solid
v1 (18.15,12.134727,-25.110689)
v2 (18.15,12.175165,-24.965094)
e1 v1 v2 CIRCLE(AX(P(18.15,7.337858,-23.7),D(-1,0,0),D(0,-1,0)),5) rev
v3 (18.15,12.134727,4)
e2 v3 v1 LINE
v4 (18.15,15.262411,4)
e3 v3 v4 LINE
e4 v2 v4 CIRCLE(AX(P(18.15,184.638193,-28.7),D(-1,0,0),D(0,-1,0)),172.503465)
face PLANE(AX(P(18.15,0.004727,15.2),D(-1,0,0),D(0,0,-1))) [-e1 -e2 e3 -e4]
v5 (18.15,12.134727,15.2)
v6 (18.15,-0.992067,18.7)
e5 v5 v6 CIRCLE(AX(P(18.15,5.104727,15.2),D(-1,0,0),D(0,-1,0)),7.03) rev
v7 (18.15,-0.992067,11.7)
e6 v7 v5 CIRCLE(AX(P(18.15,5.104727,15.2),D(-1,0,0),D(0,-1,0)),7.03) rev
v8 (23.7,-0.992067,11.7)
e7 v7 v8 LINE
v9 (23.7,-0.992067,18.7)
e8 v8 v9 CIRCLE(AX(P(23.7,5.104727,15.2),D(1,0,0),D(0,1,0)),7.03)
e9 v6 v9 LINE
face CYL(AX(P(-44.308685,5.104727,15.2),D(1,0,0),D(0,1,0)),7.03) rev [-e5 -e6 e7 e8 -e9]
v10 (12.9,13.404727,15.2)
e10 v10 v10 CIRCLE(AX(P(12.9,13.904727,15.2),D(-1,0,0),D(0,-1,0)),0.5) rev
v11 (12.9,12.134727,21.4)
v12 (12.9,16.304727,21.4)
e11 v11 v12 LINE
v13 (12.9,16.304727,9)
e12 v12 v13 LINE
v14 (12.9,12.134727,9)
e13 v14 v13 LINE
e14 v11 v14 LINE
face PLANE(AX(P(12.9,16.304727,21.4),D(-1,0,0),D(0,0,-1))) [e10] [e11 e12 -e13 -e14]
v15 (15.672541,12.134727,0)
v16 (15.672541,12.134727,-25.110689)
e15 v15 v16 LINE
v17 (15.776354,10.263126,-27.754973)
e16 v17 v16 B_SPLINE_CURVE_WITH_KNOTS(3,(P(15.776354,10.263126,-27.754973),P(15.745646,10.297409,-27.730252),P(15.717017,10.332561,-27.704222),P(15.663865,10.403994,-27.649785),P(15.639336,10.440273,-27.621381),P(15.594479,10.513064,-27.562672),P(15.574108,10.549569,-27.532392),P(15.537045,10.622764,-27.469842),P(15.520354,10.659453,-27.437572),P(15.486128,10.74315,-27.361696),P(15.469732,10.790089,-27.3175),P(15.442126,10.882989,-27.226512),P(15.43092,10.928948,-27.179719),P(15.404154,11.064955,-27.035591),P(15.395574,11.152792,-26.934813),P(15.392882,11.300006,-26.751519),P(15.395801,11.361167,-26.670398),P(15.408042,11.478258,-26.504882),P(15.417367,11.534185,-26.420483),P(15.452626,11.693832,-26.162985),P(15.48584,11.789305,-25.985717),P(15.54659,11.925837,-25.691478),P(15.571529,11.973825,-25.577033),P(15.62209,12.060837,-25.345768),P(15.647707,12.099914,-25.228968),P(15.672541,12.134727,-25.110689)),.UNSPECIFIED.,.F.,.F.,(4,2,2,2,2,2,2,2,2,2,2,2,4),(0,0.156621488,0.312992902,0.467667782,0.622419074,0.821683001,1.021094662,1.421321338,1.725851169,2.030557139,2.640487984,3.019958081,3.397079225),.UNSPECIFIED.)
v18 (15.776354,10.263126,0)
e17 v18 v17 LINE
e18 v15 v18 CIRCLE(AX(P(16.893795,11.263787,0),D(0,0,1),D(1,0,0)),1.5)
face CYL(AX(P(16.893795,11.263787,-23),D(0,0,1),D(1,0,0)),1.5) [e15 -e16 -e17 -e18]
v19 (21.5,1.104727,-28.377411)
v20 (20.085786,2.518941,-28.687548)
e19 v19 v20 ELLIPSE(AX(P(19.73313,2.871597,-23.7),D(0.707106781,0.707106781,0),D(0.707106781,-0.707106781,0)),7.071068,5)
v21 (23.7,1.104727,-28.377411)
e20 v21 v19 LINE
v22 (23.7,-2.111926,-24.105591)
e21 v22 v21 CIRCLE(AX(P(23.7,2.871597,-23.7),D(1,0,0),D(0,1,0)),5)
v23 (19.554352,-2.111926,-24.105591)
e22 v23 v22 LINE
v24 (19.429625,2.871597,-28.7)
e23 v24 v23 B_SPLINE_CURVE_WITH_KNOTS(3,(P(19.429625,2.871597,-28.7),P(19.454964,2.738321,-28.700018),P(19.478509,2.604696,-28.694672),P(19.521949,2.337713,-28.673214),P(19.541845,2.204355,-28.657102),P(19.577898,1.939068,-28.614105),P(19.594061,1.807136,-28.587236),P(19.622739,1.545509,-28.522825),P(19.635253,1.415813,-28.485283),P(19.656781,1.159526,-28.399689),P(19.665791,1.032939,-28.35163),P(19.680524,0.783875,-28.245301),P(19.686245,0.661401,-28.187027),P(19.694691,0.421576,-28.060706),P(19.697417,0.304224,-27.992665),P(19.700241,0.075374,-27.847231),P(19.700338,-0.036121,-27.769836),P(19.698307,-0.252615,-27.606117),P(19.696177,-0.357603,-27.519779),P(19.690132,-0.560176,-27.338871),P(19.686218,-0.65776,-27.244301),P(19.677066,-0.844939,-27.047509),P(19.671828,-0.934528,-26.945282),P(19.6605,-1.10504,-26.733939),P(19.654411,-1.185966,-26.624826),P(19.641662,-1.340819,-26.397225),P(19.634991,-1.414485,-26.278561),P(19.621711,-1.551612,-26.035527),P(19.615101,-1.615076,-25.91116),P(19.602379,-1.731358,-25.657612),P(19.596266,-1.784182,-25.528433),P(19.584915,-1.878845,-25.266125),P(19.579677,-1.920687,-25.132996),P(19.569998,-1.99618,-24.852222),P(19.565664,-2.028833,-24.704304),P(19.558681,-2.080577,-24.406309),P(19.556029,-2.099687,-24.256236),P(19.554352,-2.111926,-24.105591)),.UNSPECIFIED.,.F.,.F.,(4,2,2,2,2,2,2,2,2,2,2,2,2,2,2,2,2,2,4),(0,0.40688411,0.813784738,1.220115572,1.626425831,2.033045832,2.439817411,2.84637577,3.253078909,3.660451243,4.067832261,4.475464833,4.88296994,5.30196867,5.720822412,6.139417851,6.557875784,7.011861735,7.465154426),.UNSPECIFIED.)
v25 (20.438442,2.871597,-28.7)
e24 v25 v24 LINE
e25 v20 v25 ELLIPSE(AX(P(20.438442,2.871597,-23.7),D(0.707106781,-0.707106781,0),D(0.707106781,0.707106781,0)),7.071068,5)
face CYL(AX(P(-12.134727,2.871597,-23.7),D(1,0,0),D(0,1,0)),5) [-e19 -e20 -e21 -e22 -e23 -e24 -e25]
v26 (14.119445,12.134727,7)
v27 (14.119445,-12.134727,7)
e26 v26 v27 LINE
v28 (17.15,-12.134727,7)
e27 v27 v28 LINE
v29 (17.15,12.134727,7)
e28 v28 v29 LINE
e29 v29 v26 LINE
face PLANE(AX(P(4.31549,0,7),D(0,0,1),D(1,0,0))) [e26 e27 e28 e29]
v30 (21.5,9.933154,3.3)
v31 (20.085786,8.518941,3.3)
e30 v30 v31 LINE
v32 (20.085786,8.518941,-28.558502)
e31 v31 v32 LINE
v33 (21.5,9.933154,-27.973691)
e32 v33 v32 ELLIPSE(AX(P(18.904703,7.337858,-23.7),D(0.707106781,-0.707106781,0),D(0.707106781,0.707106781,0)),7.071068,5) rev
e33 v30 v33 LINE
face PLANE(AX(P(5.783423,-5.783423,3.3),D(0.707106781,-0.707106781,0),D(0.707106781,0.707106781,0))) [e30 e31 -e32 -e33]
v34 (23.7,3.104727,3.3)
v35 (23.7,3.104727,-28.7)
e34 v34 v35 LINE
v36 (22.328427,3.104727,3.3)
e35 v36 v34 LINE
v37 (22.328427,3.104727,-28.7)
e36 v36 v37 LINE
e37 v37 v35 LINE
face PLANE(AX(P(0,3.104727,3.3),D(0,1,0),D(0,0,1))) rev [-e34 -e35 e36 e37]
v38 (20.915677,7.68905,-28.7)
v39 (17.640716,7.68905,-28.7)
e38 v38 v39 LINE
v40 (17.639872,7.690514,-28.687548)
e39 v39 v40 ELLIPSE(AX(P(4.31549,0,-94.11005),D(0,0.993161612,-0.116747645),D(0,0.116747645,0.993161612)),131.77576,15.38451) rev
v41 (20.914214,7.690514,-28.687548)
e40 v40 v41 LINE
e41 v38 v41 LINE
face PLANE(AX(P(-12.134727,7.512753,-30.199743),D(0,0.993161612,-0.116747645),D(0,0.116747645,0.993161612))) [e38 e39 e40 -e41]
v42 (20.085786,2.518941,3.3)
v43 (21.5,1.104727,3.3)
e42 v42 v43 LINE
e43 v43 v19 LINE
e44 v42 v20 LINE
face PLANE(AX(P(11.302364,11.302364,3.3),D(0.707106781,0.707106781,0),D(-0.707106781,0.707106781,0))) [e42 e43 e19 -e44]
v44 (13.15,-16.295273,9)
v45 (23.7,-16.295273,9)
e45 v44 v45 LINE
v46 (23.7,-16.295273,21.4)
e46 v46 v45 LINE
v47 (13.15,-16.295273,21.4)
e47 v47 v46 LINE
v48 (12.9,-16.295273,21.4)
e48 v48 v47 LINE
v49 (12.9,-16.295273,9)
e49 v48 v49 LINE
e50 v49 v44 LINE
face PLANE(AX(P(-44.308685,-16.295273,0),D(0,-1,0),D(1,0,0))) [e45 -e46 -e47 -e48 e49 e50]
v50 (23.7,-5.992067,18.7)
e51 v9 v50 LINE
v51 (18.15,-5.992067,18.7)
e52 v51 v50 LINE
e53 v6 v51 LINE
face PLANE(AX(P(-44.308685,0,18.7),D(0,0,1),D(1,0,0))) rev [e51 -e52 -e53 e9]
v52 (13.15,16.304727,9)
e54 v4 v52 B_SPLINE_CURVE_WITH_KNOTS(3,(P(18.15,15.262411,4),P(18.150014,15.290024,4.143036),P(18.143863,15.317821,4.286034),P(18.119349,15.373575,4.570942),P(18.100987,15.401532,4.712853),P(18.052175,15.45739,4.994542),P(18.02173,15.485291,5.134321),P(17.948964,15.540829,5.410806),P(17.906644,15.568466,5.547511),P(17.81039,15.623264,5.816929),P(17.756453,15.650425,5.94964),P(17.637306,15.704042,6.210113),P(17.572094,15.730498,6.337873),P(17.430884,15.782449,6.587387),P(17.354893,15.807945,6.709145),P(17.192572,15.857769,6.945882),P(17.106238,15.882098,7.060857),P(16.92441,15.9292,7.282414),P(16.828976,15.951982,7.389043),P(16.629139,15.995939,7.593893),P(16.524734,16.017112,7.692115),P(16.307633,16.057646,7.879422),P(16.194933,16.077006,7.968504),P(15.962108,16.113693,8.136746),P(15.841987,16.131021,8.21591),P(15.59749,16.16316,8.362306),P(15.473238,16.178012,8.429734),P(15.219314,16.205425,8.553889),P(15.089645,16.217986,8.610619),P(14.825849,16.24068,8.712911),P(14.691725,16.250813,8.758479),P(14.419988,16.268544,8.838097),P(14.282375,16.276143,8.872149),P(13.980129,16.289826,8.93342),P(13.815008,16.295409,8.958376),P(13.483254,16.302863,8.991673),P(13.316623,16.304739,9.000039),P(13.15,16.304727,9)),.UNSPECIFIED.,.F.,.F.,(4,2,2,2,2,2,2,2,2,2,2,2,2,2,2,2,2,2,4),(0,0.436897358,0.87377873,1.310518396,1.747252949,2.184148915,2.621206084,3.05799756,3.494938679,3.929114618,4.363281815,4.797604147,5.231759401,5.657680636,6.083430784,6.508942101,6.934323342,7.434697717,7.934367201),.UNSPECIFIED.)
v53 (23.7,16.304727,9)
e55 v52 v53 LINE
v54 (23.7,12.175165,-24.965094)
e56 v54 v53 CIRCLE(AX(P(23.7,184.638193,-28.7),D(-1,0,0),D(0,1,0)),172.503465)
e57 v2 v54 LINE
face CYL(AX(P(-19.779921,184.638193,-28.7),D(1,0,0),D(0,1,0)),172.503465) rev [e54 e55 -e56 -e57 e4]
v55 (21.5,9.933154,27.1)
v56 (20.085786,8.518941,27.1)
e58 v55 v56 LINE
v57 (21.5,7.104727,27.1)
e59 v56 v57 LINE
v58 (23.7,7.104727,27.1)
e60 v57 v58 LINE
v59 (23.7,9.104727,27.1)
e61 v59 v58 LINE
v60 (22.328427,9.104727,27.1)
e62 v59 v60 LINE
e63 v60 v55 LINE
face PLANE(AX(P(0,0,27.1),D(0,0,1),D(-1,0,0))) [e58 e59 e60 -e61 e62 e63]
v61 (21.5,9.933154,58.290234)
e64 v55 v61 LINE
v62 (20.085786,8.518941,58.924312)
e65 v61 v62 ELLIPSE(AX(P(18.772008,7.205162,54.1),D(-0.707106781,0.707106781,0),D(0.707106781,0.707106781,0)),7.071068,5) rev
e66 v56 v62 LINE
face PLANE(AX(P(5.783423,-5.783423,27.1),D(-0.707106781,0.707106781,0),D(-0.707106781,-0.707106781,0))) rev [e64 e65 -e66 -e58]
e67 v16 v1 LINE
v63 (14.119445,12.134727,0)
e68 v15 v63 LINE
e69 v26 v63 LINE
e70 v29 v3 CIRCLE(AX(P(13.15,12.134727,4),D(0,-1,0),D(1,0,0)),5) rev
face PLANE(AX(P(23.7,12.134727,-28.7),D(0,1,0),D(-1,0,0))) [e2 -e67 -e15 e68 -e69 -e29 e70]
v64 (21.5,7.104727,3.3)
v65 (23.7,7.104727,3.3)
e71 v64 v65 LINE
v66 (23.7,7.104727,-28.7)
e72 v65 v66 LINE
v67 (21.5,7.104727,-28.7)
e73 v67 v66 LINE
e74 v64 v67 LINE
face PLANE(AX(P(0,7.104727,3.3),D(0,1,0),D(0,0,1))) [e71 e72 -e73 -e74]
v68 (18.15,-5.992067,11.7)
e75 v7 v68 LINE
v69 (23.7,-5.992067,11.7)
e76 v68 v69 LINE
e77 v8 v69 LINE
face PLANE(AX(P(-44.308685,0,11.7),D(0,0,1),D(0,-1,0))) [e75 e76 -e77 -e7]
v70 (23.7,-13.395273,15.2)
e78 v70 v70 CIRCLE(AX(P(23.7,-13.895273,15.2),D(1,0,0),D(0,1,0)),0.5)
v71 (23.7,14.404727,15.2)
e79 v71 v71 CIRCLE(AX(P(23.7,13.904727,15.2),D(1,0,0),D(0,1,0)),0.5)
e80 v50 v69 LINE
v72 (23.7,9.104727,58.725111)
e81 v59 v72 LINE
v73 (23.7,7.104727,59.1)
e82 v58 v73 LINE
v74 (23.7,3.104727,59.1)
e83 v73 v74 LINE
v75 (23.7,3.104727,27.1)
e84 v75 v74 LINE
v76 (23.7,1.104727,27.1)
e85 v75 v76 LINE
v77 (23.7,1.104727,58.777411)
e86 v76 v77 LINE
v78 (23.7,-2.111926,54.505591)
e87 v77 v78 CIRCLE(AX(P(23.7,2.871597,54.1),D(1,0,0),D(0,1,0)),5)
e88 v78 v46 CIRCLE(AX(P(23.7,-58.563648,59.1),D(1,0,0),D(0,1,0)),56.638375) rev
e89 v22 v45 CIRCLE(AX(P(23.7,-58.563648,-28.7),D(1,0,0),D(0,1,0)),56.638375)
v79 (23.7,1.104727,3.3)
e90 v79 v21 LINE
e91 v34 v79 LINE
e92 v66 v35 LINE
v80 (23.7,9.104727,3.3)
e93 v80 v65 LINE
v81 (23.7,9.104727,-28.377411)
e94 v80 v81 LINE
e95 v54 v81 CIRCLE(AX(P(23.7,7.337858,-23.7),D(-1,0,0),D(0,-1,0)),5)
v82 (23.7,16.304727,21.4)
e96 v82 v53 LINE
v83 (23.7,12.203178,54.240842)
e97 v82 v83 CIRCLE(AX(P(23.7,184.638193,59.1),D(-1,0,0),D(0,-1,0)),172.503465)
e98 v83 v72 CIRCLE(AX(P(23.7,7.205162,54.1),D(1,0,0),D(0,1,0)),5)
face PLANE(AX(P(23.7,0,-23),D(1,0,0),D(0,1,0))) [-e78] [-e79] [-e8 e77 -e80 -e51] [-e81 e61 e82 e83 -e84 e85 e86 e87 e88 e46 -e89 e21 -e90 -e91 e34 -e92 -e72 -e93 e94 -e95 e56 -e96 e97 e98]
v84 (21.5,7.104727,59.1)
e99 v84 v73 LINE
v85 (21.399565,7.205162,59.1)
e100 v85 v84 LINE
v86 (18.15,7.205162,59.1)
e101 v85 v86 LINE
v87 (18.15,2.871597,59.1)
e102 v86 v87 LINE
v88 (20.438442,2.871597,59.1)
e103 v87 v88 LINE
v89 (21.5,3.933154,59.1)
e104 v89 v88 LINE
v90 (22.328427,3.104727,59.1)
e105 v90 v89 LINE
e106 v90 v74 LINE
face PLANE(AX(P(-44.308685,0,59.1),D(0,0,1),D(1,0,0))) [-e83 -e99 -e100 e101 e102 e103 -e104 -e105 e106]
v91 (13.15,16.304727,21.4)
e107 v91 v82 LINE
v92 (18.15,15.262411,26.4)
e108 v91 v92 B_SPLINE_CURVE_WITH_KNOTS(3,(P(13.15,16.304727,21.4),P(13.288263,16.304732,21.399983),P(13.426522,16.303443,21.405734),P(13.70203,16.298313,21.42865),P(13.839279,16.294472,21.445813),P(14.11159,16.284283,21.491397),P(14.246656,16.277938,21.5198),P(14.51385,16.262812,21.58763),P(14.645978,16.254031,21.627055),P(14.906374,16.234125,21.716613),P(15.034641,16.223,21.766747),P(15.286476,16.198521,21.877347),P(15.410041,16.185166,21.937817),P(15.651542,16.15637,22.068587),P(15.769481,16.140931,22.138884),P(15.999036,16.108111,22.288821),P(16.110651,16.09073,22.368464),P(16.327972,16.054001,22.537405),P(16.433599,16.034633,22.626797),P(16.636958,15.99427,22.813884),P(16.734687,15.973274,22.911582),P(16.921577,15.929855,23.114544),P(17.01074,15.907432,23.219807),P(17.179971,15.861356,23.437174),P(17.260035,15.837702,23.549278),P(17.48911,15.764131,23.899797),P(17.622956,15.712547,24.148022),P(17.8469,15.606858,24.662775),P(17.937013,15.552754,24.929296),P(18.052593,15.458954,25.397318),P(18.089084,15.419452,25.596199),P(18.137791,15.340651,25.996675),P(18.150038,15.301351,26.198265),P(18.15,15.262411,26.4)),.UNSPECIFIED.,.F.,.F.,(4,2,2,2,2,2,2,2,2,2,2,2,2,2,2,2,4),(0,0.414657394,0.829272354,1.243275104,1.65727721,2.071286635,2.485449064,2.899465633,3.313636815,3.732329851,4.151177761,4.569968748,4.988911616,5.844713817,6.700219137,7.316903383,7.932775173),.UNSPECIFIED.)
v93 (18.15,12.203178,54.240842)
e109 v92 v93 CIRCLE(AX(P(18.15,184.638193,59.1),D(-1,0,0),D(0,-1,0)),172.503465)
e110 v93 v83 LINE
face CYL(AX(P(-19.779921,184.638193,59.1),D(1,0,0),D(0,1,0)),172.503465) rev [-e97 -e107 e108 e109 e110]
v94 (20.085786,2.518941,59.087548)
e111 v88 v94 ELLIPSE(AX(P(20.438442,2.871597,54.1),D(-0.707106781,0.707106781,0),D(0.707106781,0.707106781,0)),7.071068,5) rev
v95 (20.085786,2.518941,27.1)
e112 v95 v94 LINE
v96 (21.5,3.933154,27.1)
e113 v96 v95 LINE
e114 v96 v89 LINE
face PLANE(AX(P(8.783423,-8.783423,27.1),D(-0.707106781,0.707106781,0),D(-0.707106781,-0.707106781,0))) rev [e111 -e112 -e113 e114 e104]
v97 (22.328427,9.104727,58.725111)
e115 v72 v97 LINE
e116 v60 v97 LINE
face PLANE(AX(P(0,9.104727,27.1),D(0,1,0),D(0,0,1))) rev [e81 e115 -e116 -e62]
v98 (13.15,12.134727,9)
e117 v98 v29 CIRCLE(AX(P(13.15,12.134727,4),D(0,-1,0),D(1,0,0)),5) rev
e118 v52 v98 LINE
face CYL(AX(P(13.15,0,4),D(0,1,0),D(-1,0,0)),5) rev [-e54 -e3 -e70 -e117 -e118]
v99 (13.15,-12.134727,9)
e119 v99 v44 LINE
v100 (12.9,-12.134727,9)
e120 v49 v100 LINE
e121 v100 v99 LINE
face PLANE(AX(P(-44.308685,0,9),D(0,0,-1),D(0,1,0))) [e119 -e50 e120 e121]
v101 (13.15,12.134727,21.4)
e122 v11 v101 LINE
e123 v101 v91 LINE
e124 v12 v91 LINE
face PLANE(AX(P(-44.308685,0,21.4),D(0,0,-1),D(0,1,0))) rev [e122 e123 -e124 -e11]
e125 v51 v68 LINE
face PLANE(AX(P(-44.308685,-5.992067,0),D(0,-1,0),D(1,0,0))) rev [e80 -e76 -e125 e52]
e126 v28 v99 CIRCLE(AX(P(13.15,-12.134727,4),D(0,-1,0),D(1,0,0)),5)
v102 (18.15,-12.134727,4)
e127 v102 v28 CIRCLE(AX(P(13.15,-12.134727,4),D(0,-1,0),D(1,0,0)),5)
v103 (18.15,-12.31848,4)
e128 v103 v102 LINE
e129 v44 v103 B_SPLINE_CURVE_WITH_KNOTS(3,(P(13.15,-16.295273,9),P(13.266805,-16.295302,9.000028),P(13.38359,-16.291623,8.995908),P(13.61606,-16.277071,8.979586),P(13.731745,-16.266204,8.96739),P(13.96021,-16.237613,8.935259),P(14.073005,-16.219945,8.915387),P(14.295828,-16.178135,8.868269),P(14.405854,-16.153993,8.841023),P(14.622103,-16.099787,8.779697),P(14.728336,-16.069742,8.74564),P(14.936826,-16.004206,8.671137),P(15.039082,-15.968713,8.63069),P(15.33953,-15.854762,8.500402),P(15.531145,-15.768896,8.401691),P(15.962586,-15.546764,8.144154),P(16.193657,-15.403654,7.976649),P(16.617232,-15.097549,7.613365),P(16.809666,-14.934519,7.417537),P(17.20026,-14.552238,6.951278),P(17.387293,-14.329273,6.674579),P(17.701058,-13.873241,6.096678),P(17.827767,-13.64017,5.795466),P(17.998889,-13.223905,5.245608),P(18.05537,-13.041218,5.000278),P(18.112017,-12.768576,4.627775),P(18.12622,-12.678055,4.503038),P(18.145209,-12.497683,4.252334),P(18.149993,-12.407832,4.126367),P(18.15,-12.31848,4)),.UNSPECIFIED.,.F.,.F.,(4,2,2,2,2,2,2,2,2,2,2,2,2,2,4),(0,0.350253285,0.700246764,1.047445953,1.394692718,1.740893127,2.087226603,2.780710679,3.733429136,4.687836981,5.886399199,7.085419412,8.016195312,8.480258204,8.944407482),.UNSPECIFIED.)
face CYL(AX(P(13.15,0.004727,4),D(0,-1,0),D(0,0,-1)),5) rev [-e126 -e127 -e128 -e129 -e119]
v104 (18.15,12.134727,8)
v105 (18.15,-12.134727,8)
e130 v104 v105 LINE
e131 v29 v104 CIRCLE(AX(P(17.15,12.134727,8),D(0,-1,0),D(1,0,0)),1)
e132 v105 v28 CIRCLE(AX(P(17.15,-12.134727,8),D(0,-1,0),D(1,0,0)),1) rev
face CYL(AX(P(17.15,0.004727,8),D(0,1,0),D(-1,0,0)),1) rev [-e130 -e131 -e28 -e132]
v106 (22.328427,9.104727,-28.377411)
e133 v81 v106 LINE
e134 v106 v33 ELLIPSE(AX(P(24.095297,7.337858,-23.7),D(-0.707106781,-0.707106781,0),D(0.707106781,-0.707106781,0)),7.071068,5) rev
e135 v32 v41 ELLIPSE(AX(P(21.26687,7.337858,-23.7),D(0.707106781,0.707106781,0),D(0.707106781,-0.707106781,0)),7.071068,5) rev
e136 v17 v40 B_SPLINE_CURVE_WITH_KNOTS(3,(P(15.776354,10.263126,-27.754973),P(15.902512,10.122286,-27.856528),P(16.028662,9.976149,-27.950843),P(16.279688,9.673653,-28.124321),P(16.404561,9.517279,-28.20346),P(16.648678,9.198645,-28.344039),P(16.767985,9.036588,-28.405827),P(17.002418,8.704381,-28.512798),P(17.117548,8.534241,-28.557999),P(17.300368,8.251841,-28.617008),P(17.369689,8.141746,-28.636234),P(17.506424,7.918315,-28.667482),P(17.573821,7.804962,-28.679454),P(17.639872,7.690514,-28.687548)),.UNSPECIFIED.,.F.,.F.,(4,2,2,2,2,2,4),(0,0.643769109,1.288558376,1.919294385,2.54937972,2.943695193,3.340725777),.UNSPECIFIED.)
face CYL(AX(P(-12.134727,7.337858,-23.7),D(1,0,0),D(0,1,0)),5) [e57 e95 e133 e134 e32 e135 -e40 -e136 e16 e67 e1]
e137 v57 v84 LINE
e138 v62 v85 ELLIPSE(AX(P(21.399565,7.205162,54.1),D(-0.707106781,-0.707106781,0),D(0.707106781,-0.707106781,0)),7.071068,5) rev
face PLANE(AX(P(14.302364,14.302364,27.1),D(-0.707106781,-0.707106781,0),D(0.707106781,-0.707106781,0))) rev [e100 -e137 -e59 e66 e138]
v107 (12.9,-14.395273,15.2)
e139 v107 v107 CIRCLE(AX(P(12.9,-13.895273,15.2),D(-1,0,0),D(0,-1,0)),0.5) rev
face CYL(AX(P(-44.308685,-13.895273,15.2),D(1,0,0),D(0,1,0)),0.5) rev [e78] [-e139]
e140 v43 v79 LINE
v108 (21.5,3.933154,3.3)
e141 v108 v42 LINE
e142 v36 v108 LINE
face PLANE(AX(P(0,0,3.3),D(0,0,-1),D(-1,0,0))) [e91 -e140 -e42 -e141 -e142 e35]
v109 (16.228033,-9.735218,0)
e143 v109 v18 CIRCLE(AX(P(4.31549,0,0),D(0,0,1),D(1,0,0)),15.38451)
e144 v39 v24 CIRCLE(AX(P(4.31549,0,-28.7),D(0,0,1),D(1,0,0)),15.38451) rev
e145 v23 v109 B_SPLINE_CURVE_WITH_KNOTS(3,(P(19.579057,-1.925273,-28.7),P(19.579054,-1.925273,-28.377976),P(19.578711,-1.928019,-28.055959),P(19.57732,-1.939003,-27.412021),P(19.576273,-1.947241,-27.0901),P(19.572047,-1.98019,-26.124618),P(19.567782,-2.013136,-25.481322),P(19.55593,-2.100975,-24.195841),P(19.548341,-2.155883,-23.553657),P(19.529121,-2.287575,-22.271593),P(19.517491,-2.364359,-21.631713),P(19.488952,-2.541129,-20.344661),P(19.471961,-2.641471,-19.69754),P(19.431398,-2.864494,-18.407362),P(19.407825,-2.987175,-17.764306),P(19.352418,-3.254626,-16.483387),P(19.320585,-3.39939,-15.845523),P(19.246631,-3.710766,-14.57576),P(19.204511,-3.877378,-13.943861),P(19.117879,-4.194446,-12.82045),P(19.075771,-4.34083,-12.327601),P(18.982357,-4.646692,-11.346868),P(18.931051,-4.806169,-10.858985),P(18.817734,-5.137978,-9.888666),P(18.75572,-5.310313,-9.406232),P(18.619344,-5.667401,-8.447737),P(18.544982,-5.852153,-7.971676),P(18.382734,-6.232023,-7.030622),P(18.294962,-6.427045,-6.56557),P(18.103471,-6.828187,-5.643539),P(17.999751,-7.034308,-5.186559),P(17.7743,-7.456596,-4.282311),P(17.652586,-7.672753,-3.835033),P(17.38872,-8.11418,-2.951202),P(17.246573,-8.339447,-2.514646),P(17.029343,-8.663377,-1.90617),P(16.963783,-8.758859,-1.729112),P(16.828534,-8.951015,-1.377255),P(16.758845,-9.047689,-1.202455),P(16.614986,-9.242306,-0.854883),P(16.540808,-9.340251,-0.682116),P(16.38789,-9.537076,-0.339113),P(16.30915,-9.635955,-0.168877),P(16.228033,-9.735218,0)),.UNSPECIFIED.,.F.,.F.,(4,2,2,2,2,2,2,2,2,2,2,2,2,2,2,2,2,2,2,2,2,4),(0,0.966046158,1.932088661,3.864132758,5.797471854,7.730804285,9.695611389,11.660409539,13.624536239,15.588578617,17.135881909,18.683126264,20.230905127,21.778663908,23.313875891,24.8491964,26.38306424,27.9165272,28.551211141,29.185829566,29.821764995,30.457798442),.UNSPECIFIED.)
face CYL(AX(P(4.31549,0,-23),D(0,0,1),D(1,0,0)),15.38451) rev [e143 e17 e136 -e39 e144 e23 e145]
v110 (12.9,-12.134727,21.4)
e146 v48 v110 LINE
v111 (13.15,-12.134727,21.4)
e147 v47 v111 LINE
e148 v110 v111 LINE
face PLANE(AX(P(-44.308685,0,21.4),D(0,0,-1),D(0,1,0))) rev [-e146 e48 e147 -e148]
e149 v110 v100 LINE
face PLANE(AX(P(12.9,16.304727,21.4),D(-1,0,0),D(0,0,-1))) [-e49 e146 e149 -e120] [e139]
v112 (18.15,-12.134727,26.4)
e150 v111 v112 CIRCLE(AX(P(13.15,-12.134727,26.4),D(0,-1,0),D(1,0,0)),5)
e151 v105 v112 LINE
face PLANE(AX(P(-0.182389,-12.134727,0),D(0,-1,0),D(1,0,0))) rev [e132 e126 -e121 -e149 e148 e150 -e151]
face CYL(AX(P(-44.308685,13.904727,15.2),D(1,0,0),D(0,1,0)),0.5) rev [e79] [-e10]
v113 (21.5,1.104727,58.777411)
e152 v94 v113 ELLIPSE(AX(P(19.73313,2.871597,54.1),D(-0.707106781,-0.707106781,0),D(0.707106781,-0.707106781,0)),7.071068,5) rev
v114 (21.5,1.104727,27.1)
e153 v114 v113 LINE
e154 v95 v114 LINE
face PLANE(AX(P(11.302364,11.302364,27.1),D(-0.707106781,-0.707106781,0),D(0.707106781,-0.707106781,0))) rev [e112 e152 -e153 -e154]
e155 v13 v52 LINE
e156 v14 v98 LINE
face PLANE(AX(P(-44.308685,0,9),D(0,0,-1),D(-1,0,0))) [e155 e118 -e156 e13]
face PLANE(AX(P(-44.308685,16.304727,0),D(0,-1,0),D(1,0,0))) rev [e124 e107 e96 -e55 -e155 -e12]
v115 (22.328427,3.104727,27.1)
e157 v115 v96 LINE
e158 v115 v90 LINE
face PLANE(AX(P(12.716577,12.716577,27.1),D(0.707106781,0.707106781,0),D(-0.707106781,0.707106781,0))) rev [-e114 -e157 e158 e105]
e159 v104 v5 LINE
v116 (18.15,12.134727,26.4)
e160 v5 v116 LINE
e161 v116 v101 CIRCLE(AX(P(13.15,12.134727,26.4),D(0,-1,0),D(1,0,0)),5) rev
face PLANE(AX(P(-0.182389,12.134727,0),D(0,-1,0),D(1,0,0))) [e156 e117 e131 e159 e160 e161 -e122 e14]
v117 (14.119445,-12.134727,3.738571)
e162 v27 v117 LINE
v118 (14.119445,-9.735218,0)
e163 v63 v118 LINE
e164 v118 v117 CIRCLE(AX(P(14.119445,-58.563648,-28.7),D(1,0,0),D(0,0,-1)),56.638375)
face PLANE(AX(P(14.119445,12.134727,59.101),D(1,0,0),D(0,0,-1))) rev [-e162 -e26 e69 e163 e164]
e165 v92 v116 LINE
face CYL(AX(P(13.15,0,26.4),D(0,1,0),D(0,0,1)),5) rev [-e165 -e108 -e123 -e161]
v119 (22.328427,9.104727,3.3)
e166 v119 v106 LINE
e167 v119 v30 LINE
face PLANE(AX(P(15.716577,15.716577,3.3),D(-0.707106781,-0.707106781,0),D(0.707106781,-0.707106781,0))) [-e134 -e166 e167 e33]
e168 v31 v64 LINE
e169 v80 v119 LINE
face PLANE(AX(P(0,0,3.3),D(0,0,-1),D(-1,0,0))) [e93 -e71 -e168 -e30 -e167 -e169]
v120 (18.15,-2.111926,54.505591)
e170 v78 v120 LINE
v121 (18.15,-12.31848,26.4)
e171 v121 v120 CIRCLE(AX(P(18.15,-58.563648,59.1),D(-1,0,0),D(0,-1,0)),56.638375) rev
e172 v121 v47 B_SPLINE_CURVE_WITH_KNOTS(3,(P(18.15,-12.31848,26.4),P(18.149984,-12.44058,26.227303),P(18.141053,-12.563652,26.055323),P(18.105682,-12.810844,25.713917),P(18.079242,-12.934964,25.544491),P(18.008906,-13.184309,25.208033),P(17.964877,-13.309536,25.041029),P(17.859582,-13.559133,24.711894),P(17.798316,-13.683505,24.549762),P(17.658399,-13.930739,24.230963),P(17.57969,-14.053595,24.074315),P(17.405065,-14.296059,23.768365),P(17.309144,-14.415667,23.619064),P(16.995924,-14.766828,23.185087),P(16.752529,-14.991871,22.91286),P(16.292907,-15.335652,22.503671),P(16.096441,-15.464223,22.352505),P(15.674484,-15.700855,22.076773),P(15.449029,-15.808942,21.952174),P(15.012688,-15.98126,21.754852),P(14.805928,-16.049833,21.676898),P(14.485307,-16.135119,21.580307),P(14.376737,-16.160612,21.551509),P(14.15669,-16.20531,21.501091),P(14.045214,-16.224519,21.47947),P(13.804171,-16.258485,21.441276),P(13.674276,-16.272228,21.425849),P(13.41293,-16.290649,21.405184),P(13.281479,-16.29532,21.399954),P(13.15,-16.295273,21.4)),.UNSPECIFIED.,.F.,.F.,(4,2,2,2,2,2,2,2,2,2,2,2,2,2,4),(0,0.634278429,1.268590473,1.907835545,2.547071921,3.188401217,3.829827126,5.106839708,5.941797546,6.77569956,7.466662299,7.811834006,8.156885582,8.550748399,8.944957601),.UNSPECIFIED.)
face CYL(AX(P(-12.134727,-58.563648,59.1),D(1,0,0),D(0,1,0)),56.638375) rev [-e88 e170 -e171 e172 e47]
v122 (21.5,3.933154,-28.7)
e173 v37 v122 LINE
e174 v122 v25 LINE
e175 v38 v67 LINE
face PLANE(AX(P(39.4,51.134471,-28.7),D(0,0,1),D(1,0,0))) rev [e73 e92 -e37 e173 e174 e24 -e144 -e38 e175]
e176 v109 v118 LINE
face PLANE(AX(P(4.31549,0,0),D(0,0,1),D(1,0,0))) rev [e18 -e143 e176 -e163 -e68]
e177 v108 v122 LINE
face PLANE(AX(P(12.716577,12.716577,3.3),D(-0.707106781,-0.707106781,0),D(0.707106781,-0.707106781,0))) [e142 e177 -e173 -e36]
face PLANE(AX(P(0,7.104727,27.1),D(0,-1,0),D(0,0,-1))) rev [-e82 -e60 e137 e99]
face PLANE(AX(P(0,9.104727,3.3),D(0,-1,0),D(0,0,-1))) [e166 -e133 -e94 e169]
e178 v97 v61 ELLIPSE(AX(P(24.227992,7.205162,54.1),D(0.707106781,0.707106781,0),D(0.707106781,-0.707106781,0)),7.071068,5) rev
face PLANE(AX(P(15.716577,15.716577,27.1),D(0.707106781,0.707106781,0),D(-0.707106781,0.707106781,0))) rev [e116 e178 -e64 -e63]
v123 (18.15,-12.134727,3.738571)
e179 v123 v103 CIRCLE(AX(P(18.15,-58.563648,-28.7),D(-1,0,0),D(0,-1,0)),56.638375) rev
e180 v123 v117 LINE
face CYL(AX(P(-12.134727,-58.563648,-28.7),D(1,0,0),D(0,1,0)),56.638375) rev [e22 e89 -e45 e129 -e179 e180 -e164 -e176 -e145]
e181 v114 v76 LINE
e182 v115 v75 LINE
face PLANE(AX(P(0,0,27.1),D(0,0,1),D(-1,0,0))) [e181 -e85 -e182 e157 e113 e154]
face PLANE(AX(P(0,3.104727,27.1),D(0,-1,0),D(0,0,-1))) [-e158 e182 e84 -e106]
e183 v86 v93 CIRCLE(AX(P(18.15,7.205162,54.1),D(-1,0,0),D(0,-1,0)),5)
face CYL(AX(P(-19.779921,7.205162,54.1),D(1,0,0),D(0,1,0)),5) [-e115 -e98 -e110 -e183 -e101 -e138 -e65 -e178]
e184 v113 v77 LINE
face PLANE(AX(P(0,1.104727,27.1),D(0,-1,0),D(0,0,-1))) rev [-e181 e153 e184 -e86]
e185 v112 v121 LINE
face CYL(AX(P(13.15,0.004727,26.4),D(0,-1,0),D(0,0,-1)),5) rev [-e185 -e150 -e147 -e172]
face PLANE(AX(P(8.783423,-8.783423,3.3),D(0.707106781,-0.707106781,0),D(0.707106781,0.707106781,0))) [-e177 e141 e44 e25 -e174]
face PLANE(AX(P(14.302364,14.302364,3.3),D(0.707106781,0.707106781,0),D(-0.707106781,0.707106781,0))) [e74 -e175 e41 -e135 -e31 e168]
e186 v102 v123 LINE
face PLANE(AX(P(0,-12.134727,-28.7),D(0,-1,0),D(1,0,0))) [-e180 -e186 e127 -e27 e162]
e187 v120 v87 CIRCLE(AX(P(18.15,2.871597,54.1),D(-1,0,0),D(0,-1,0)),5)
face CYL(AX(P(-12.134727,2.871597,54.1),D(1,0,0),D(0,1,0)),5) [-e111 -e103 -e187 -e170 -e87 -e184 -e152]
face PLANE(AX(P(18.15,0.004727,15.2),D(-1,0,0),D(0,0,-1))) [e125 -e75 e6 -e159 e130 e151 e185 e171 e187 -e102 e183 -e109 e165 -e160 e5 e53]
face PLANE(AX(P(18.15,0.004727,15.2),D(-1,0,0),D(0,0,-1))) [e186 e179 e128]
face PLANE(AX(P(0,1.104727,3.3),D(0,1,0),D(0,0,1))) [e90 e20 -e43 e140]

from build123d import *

# Parameters (mm, degrees)
SKETCH1_R               = 2
BOSS_EXTRUDE3_DEPTH     = 7
SKETCH3_R               = 1.0000000000000002
SKETCH3_R_2             = 0.9999999999999998
SKETCH3_R_3             = 0.9999999999999996
SKETCH3_R_4             = 0.9999999999999993
CUT_EXTRUDE2_DEPTH      = 26.09227496303999
BOSS_EXTRUDE4_START     = -7
BOSS_EXTRUDE4_DEPTH     = 7
BOSS_EXTRUDE5_START     = -30
BOSS_EXTRUDE5_DEPTH     = 30
FILLET2_R               = 1.5
CUT_EXTRUDE5_DEPTH      = 42.36510924463761
BOSS_EXTRUDE6_DEPTH     = 10.5
MOVE_START              = -28.7
MOVE_FACE1_DEPTH        = 5.7
DELETEFACE1_START       = 23.7
DELETEFACE1_OUTLINE_W   = 10.499999999999998
DELETEFACE1_OUTLINE_H   = 35.699999999999996
DELETEFACE1_DEPTH       = 15.7
SKETCH11_OUTSIDE_W      = 51.876
SKETCH11_OUTSIDE_H      = 42.462
CUT_EXTRUDE6_DEPTH      = 46.16926949380307
SERVO_START             = -12.760864102
SERVO_MICRO_OUTLINE_W   = 22.6
SERVO_MICRO_OUTLINE_H   = 12.399999999999999
SERVO_MICRO_DEPTH       = 22.3
SERVO_START_2           = 9.539135898
SERVO_MICRO_2_DEPTH     = 4.3
SERVO_START_3           = 2.889135898
SERVO_MICRO_3_DEPTH     = 2.4
SERVO_START_4           = 13.839135898
SERVO_MICRO_4_OUTLINE_R = 2.5
SERVO_MICRO_4_DEPTH     = 3.3
SERVO_START_5           = -25.667487826
SERVO_MICRO_5_OUTLINE_R = 0.6
SERVO_MICRO_5_DEPTH     = 2.3
SERVO_MICRO_6_OUTLINE_R = 0.6
SERVO_MICRO_6_DEPTH     = 2.3
SERVO_MICRO_7_OUTLINE_R = 0.6
SERVO_MICRO_7_DEPTH     = 2.3
BODY_MOVE_COPY1_ANGLE   = 90
SKETCH13_R              = 0.5000000000000009
BOSS_EXTRUDE7_DEPTH     = 5.55
SKETCH13_3_R            = 0.5000000000000009
BOSS_EXTRUDE8_DEPTH     = 10.8
CUT_EXTRUDE7_DEPTH      = 32
BOSS_EXTRUDE9_DEPTH     = 5.55
CUT_EXTRUDE8_DEPTH      = 72.0125468998838
BOSS_EXTRUDE10_DEPTH    = 5.55
FILLET4_R               = 5
CUT_EXTRUDE10_DEPTH     = 72.01254695034633
FILLET8_START           = 12.13472734
FILLET8_DEPTH           = 2.98662
FILLET8_START_2         = -12.463268044
FILLET8_2_DEPTH         = 0.328540704
FILLET8_START_3         = -16.295273118
FILLET8_3_DEPTH         = 3.832005074
FILLET8_START_4         = 15.12134734
FILLET8_4_DEPTH         = 1.18338
FILLET8_START_5         = -7.24411042
FILLET8_5_DEPTH         = 25.39411042
FILLET9_R               = 1
CUT_EXTRUDE11_REACH     = 67.729
SKETCH20_W              = 27.71545594337198
SKETCH20_H              = 25.17831686014588


with BuildPart() as part:
    # Sketch1 → Boss-Extrude3 (new body)
    with BuildSketch(Plane.XY):
        with BuildLine():
            Line((5.606455718863049, 13.824363162033857), (-15.462379801128069, 15.791841653866829))
            Line((-15.462379801128069, 15.791841653866829), (-15.46237980112806, -15.791841653866806))
            Line((-15.46237980112806, -15.791841653866806), (5.606455718863063, -13.824363162033817))
            ThreePointArc((5.606455718863063, -13.824363162033817), (18.200000000000003, 2.613e-14), (5.606455718863049, 13.824363162033857))
        make_face()
        Circle(SKETCH1_R, mode=Mode.SUBTRACT)
    extrude(amount=BOSS_EXTRUDE3_DEPTH)

    # Sketch3 → Cut-Extrude2 (cut, through all)
    with BuildSketch(Plane.XY.offset(7)):
        with Locations((-4.5, 0)):
            Circle(SKETCH3_R)
        with Locations((-8.499999999999998, 0)):
            Circle(SKETCH3_R_2)
        with Locations(Location((4.5, -1.73e-15, 0), (0, 0, 180))):
            Circle(SKETCH3_R_3)
        with Locations(Location((8.499999999999998, -1.73e-15, 0), (0, 0, 180))):
            Circle(SKETCH3_R_4)
    extrude(amount=-CUT_EXTRUDE2_DEPTH, mode=Mode.SUBTRACT)

    # Sketch6 → Boss-Extrude4 (add)
    with BuildSketch(Plane.XY.offset(7).offset(BOSS_EXTRUDE4_START)):
        with BuildLine():
            Line((12.20372638619735, 13.208287910486863), (5.606455718863047, 13.824363162033858))
            ThreePointArc((5.606455718863047, 13.82436316203386), (18.2, 2.598e-14), (5.606455718863056, -13.824363162033816))
            Line((5.606455718863056, -13.824363162033816), (12.203726386197348, -13.208287910486817))
            ThreePointArc((12.203726386197348, -13.208287910486817), (19.699999999999996, 2.132e-14), (12.20372638619735, 13.20828791048686))
        make_face()
    extrude(amount=BOSS_EXTRUDE4_DEPTH)

    # Sketch6<3> → Boss-Extrude5 (add)
    with BuildSketch(Plane.XY.offset(7).offset(BOSS_EXTRUDE5_START)):
        with BuildLine():
            Line((23.700000000000006, 12.13472734042489), (12.20372638619735, 13.208287910486863))
            ThreePointArc((12.20372638619735, 13.20828791048686), (19.699999999999996, 2.132e-14), (12.203726386197348, -13.208287910486817))
            Line((12.203726386197348, -13.208287910486817), (23.700000000000003, -12.134727340424835))
            Line((23.700000000000003, -12.134727340424835), (23.700000000000006, 12.134727340424892))
        make_face()
    extrude(amount=BOSS_EXTRUDE5_DEPTH)

    # Fillet2
    fillet2_edges = [part.edges().sort_by_distance(p)[0] for p in [
        (12.20372638619735, -13.208287910486817, -11.5),
        (12.20372638619735, 13.208287910486861, -11.5),
    ]]
    fillet(fillet2_edges, radius=FILLET2_R)

    # Sketch8 → Cut-Extrude5 (cut, through all)
    with BuildSketch(Plane.XY.offset(7)):
        with BuildLine():
            Line((-15.462379801128069, 15.791841653866829), (-15.46237980112806, -15.791841653866808))
            Line((-15.46237980112806, -15.791841653866806), (1.328273056892355, -14.223874201150027))
            ThreePointArc((1.3282730568923518, -14.22387420115002), (-14.285758873920813, 0), (1.3282730568923529, 14.22387420115002))
            Line((1.3282730568923604, 14.223874201150062), (-15.462379801128069, 15.791841653866829))
        make_face()
    extrude(amount=-CUT_EXTRUDE5_DEPTH, mode=Mode.SUBTRACT)

    # Sketch10 → Boss-Extrude6 (add)
    with BuildSketch(Plane.ZX.offset(1.6347273404248903)):
        Polygon((7, 23.700000000000003), (7, 39.40000000018666), (-28.700000000000003, 39.40000000018665), (-28.700000000000014, 23.700000000000003), align=None)
    extrude(amount=BOSS_EXTRUDE6_DEPTH)

    # Move Face1: read off the stored shape, not the designer's step
    # Move Face1 outline → Move Face1 (add)
    with BuildSketch(Plane.XY.offset(MOVE_START)):
        with BuildLine():
            Line((17.033263706, -12.757289525), (23.7, -12.13472734))
            Line((23.7, -12.13472734), (23.7, 12.13472734))
            Line((23.7, 12.13472734), (17.033263706, 12.757289525))
            ThreePointArc((17.033263706, 12.757289525), (15.554272674, 11.938827155), (15.776353621, 10.263125757))
            ThreePointArc((15.776353621, 10.263125757), (19.7, 0), (15.776353621, -10.263125757))
            ThreePointArc((15.776353621, -10.263125757), (15.554272674, -11.938827155), (17.033263706, -12.757289525))
        make_face()
    extrude(amount=MOVE_FACE1_DEPTH)

    # DeleteFace1: read off the stored shape, not the designer's step
    # DeleteFace1 outline → DeleteFace1 (cut)
    with BuildSketch(Plane.YZ.offset(DELETEFACE1_START)):
        with Locations((6.884727339999999, -10.849999999999998)):
            Rectangle(DELETEFACE1_OUTLINE_W, DELETEFACE1_OUTLINE_H)
    extrude(amount=DELETEFACE1_DEPTH, mode=Mode.SUBTRACT)

    # Sketch11 outside → Cut-Extrude6 (cut, through all)
    with BuildSketch(Plane.XY.offset(7)):
        with Locations((4.706999999999997, 0)):
            Rectangle(SKETCH11_OUTSIDE_W, SKETCH11_OUTSIDE_H)
        with BuildLine():
            Line((23.700000000000003, 12.134727340424888), (-1.43e-15, 12.134727340424885))
            ThreePointArc((-1.43e-15, 12.134727340424885), (-12.134727340424885, 1.49e-15), (0, -12.134727340424885))
            Line((0, -12.134727340424885), (23.700000000000006, -12.134727340424835))
            Line((23.700000000000006, -12.134727340424835), (23.700000000000003, 12.134727340424888))
        make_face(mode=Mode.SUBTRACT)
    extrude(amount=-CUT_EXTRUDE6_DEPTH, mode=Mode.SUBTRACT)

    # Sketch13 → Boss-Extrude7 (add)
    # profile 1 of 3: a face of its own
    with BuildSketch(Plane(origin=(23.700000000000003, -3.39e-15, 0), x_dir=(0, 0, -1), z_dir=(1, -1.4e-16, 0))):
        Polygon((-8.999999999999998, -16.295272659575108), (-9.000000000000002, -12.134727340424831), (-7, -12.134727340424831), (-6.999999999999999, 12.134727340424892), (-9.000000000000002, 12.134727340424888), (-9.000000000000002, 16.30472734042489), (-21.4, 16.30472734042489), (-21.399999999999995, 12.134727340424888), (-59.100000000000016, 12.134727340424885), (-59.100000000000016, -12.134727340424831), (-21.399999999999995, -12.134727340424831), (-21.4, -16.295272659575108), align=None)
        with Locations(Location((-15.200000000000001, 13.904727340424891, 0), (0, 0, 90))):
            Circle(SKETCH13_R, mode=Mode.SUBTRACT)
        with Locations(Location((-15.200000000000001, -13.895272659575111, 0), (0, 0, 90))):
            Circle(SKETCH13_R, mode=Mode.SUBTRACT)
        with BuildLine():
            ThreePointArc((-11.700000000000001, -0.9920668991734916), (-15.199999999999998, 12.13472734042489), (-18.700000000000003, -0.9920668991734924))
            Line((-18.700000000000003, -0.9920668991734924), (-18.700000000000003, -5.9920668991734924))
            Line((-18.700000000000003, -5.9920668991734924), (-11.700000000000003, -5.992066899173492))
            Line((-11.700000000000003, -5.992066899173492), (-11.700000000000001, -0.9920668991734916))
        make_face(mode=Mode.SUBTRACT)
    # profile 2 of 3: a face of its own
    with BuildSketch(Plane(origin=(23.700000000000003, -3.39e-15, 0), x_dir=(0, 0, -1), z_dir=(1, -1.4e-16, 0))):
        Polygon((-21.399999999999995, 12.134727340424888), (-21.4, 16.30472734042489), (-9.000000000000002, 16.30472734042489), (-9.000000000000002, 12.134727340424888), align=None)
        with Locations(Location((-15.200000000000001, 13.904727340424891, 0), (0, 0, 90))):
            Circle(SKETCH13_R, mode=Mode.SUBTRACT)
    # profile 3 of 3: a face of its own
    with BuildSketch(Plane(origin=(23.700000000000003, -3.39e-15, 0), x_dir=(0, 0, -1), z_dir=(1, -1.4e-16, 0))):
        Polygon((-21.399999999999995, -12.134727340424831), (-9.000000000000002, -12.134727340424831), (-8.999999999999998, -16.295272659575108), (-21.4, -16.295272659575108), align=None)
        with Locations(Location((-15.200000000000001, -13.895272659575111, 0), (0, 0, 90))):
            Circle(SKETCH13_R, mode=Mode.SUBTRACT)
    extrude(amount=-BOSS_EXTRUDE7_DEPTH)

    # Sketch13<3> → Boss-Extrude8 (add)
    # profile 1 of 2: a face of its own
    with BuildSketch(Plane(origin=(23.700000000000003, -3.39e-15, 0), x_dir=(0, 0, -1), z_dir=(1, -1.4e-16, 0))):
        Polygon((-21.399999999999995, 12.134727340424888), (-21.4, 16.30472734042489), (-9.000000000000002, 16.30472734042489), (-9.000000000000002, 12.134727340424888), align=None)
        with Locations(Location((-15.200000000000001, 13.904727340424891, 0), (0, 0, 90))):
            Circle(SKETCH13_3_R, mode=Mode.SUBTRACT)
    # profile 2 of 2: a face of its own
    with BuildSketch(Plane(origin=(23.700000000000003, -3.39e-15, 0), x_dir=(0, 0, -1), z_dir=(1, -1.4e-16, 0))):
        Polygon((-21.399999999999995, -12.134727340424831), (-9.000000000000002, -12.134727340424831), (-8.999999999999998, -16.295272659575108), (-21.4, -16.295272659575108), align=None)
        with Locations(Location((-15.200000000000001, -13.895272659575111, 0), (0, 0, 90))):
            Circle(SKETCH13_3_R, mode=Mode.SUBTRACT)
    extrude(amount=-BOSS_EXTRUDE8_DEPTH)

    # Sketch15 → Cut-Extrude7 (cut)
    with BuildSketch(Plane(origin=(1.903e-14, 0, -28.70000000000003), x_dir=(-1, 0, -6.6e-16), z_dir=(6.6e-16, 0, -1))):
        Polygon((-22.328427124746177, 3.104727340424887), (-23.699999999999985, 3.104727340424887), (-23.699999999999985, 1.1047273404248876), (-21.499999999999986, 1.1047273404248876), (-20.08578643762689, 2.5189409027979854), (-21.49999999999999, 3.9331544651710773), align=None)
        Polygon((-22.328427124746177, 9.104727340424887), (-23.699999999999985, 9.104727340424887), (-23.699999999999985, 7.104727340424887), (-21.499999999999986, 7.104727340424887), (-20.08578643762689, 8.518940902797986), (-21.49999999999999, 9.933154465171077), align=None)
    cut_extrude7 = extrude(amount=-CUT_EXTRUDE7_DEPTH, mode=Mode.SUBTRACT)

    # Mirror1: Cut-Extrude7 across plane
    add(cut_extrude7.mirror(Plane(origin=(0, 0, 15.200000000000001), x_dir=(1, 0, 0), z_dir=(0, 0, -1))), mode=Mode.SUBTRACT)

    # Sketch16 → Boss-Extrude9 (add)
    with BuildSketch(Plane(origin=(23.700000000000003, -3.39e-15, 0), x_dir=(0, 0, -1), z_dir=(1, -1.4e-16, 0))):
        with BuildLine():
            Line((-21.399999999999995, 12.134727340424888), (-21.4, 16.30472734042489))
            ThreePointArc((-21.4, 16.30472734042489), (-40.135039546574305, 13.18039662240372), (-59.100000000000016, 12.134727340424885))
            Line((-59.100000000000016, 12.134727340424885), (-21.399999999999995, 12.134727340424888))
        make_face()
        with BuildLine():
            Line((-9.000000000000002, 16.30472734042489), (-9.000000000000002, 12.13472734042489))
            Line((-9.000000000000002, 12.13472734042489), (28.700000000000014, 12.134727340424892))
            ThreePointArc((28.700000000000014, 12.134727340424892), (9.735039546574328, 13.180396622403777), (-9.000000000000002, 16.30472734042489))
        make_face()
    extrude(amount=-BOSS_EXTRUDE9_DEPTH)

    # Sketch18 → Cut-Extrude8 (cut, through all)
    with BuildSketch(Plane(origin=(23.700000000000003, -3.39e-15, 0), x_dir=(0, 0, -1), z_dir=(1, -1.4e-16, 0))):
        with BuildLine():
            Line((-59.100000000000016, -12.134727340424831), (-26.661429094135563, -12.134727340424831))
            ThreePointArc((-26.661429094135563, -12.134727340424838), (-42.096369157624615, -4.537893974213425), (-59.100000000000016, -1.9252726595751))
            Line((-59.100000000000016, -1.9252726595751037), (-59.100000000000016, -12.134727340424831))
        make_face()
        with BuildLine():
            Line((-3.7385709058644423, -12.134727340424831), (28.700000000000003, -12.134727340424831))
            Line((28.700000000000003, -12.134727340424831), (28.700000000000003, -1.9252726595751037))
            ThreePointArc((28.700000000000003, -1.9252726595751), (11.69636915762461, -4.537893974213425), (-3.738570905864435, -12.134727340424838))
        make_face()
    extrude(amount=-CUT_EXTRUDE8_DEPTH, mode=Mode.SUBTRACT)

    # Sketch18<3> → Boss-Extrude10 (add)
    with BuildSketch(Plane(origin=(23.700000000000003, -3.39e-15, 0), x_dir=(0, 0, -1), z_dir=(1, -1.4e-16, 0))):
        with BuildLine():
            ThreePointArc((-26.661429094135563, -12.134727340424838), (-23.96906894889605, -14.137042924937433), (-21.4, -16.295272659575097))
            Line((-21.4, -16.295272659575108), (-21.4, -12.134727340424831))
            Line((-21.4, -12.134727340424831), (-26.66142909413556, -12.134727340424831))
        make_face()
        with BuildLine():
            ThreePointArc((-9, -16.295272659575097), (-6.430931051103947, -14.137042924937433), (-3.738570905864435, -12.134727340424838))
            Line((-3.7385709058644423, -12.134727340424831), (-9.000000000000005, -12.134727340424831))
            Line((-9.000000000000005, -12.134727340424831), (-9.000000000000005, -16.295272659575108))
        make_face()
    extrude(amount=-BOSS_EXTRUDE10_DEPTH)

    # Fillet4
    fillet4_edges = [part.edges().sort_by_distance(p)[0] for p in [
        (21.63952842596371, -1.9252726595751048, -28.700000000000003),
        (20.925, -1.925272659575101, 59.10000000000002),
        (20.925000000000004, 12.134727340424881, 59.100000000000016),
    ]]
    fillet(fillet4_edges, radius=FILLET4_R)

    # Sketch19 → Cut-Extrude10 (cut, through all)
    with BuildSketch(Plane(origin=(23.700000000000003, -3.39e-15, 0), x_dir=(0, 0, -1), z_dir=(1, -1.4e-16, 0))):
        with BuildLine():
            Line((24.105591483628846, 12.321380196120076), (30.19974331893468, 12.321380196120076))
            Line((30.19974331893468, 12.321380196120076), (30.19974331893468, 7.512752922909521))
            Line((30.19974331893468, 7.512752922909521), (28.687547870024137, 7.690513778051795))
            ThreePointArc((28.687547870024137, 7.690513778051795), (28.58393863914358, 8.408905582685197), (28.37741082226619, 9.10472734042489))
            ThreePointArc((28.37741082226619, 9.10472734042489), (26.70764725474025, 11.33211091295099), (24.105591483628846, 12.321380196120076))
        make_face()
    extrude(amount=-CUT_EXTRUDE10_DEPTH, mode=Mode.SUBTRACT)

    # Fillet8: read off the stored shape, not the designer's step
    # Fillet8 outline → Fillet8 (add)
    with BuildSketch(Plane(origin=(0, 0, 0), x_dir=(1, 0, 0), z_dir=(0, 1, 0)).offset(FILLET8_START)):
        with BuildLine():
            Line((13.15, -9), (18.15, -9))
            Line((18.15, -9), (18.15, -4))
            ThreePointArc((18.15, -4), (16.685533906, -7.535533906), (13.15, -9))
        make_face()
        with BuildLine():
            ThreePointArc((13.15, -21.4), (16.685533906, -22.864466094), (18.15, -26.4))
            Line((18.15, -26.4), (18.15, -21.4))
            Line((18.15, -21.4), (13.15, -21.4))
        make_face()
    extrude(amount=FILLET8_DEPTH)

    # Fillet8 2 outline → Fillet8 2 (add)
    with BuildSketch(Plane(origin=(0, 0, 0), x_dir=(1, 0, 0), z_dir=(0, 1, 0)).offset(FILLET8_START_2)):
        with BuildLine():
            Line((13.15, -9), (18.15, -9))
            Line((18.15, -9), (18.15, -4))
            ThreePointArc((18.15, -4), (16.685533906, -7.535533906), (13.15, -9))
        make_face()
        with BuildLine():
            ThreePointArc((13.15, -21.4), (16.685533906, -22.864466094), (18.15, -26.4))
            Line((18.15, -26.4), (18.15, -21.4))
            Line((18.15, -21.4), (13.15, -21.4))
        make_face()
    extrude(amount=FILLET8_2_DEPTH)

    # Fillet8 3 outline → Fillet8 3 (add)
    with BuildSketch(Plane(origin=(0, 0, 0), x_dir=(1, 0, 0), z_dir=(0, 1, 0)).offset(FILLET8_START_3)):
        with BuildLine():
            ThreePointArc((13.15, -21.4), (16.685533906, -22.864466094), (18.15, -26.4))
            Line((18.15, -26.4), (18.15, -21.4))
            Line((18.15, -21.4), (13.15, -21.4))
        make_face()
        with BuildLine():
            ThreePointArc((18.15, -4), (16.685533906, -7.535533906), (13.15, -9))
            Line((13.15, -9), (18.15, -9))
            Line((18.15, -9), (18.15, -4))
        make_face()
    extrude(amount=FILLET8_3_DEPTH)

    # Fillet8 4 outline → Fillet8 4 (add)
    with BuildSketch(Plane(origin=(0, 0, 0), x_dir=(1, 0, 0), z_dir=(0, 1, 0)).offset(FILLET8_START_4)):
        with BuildLine():
            ThreePointArc((13.15, -21.4), (16.685533906, -22.864466094), (18.15, -26.4))
            Line((18.15, -26.4), (18.15, -21.4))
            Line((18.15, -21.4), (13.15, -21.4))
        make_face()
        with BuildLine():
            ThreePointArc((18.15, -4), (16.685533906, -7.535533906), (13.15, -9))
            Line((13.15, -9), (18.15, -9))
            Line((18.15, -9), (18.15, -4))
        make_face()
    extrude(amount=FILLET8_4_DEPTH)

    # Fillet8 5 outline → Fillet8 5 (cut)
    with BuildSketch(Plane.YZ.offset(FILLET8_START_5)):
        with BuildLine():
            ThreePointArc((-12.31848008, 4), (-14.236321993, 6.556116122), (-16.295272761, 9.000000114))
            Line((-16.295272761, 9.000000114), (-16.295273118, 4))
            Line((-16.295273118, 4), (-12.31848008, 4))
        make_face()
        with BuildLine():
            Line((-16.295273118, 26.4), (-16.295272761, 21.399999886))
            ThreePointArc((-16.295272761, 21.399999886), (-14.236321993, 23.843883878), (-12.31848008, 26.4))
            Line((-12.31848008, 26.4), (-16.295273118, 26.4))
        make_face()
        with BuildLine():
            Line((16.30472734, 26.4), (15.262410605, 26.4))
            ThreePointArc((15.262410605, 26.4), (15.765062943, 23.896142171), (16.30472734, 21.4))
            Line((16.30472734, 21.4), (16.30472734, 26.4))
        make_face()
        with BuildLine():
            Line((16.30472734, 4), (16.30472734, 9))
            ThreePointArc((16.30472734, 9), (15.765062943, 6.503857829), (15.262410605, 4))
            Line((15.262410605, 4), (16.30472734, 4))
        make_face()
    extrude(amount=FILLET8_5_DEPTH, mode=Mode.SUBTRACT)

    # Fillet9
    fillet9_edges = [part.edges().sort_by_distance(p)[0] for p in [
        (18.150000000000002, 2.76e-14, 7),
    ]]
    fillet(fillet9_edges, radius=FILLET9_R)

    # Sketch20 → Cut-Extrude11 (cut, up to next)
    with BuildSketch(Plane(origin=(0, 0, 0), x_dir=(-1, 0, 0), z_dir=(0, 0, -1)), mode=Mode.PRIVATE) as cut_extrude11_sk1:
        with Locations((-0.26171750586786313, -0.4544310896480539)):
            Rectangle(SKETCH20_W, SKETCH20_H)
    cut_extrude11_tool1 = extrude(cut_extrude11_sk1.sketch, amount=-CUT_EXTRUDE11_REACH, mode=Mode.PRIVATE) & part.part
    add(cut_extrude11_tool1.solids().sort_by_distance((0.261718, -0.454431, 0))[0], mode=Mode.SUBTRACT)


with BuildPart() as body_2:
    # Servo Micro: read off the stored shape, not the designer's step
    # Servo Micro outline → Servo Micro (new body)
    with BuildSketch(Plane(origin=(0, 0, 0), x_dir=(1, 0, 0), z_dir=(0, 1, 0)).offset(SERVO_START)):
        with Locations((-12.067487826, -26.388081974)):
            Rectangle(SERVO_MICRO_OUTLINE_W, SERVO_MICRO_OUTLINE_H)
    extrude(amount=SERVO_MICRO_DEPTH)

    # Servo Micro 2 outline → Servo Micro 2 (add)
    with BuildSketch(Plane(origin=(0, 0, 0), x_dir=(1, 0, 0), z_dir=(0, 1, 0)).offset(SERVO_START_2)):
        with BuildLine():
            ThreePointArc((-11.10082116, -25.109193568), (-23.367487826, -26.388081974), (-11.10082116, -27.666970381))
            ThreePointArc((-11.10082116, -27.666970381), (-9.567487826, -26.388081975), (-11.10082116, -25.109193568))
        make_face()
    extrude(amount=SERVO_MICRO_2_DEPTH)

    # Servo Micro 3 outline → Servo Micro 3 (add)
    with BuildSketch(Plane(origin=(0, 0, 0), x_dir=(1, 0, 0), z_dir=(0, 1, 0)).offset(SERVO_START_3)):
        with BuildLine():
            Line((2.667676828, -25.838081974), (4.232512174, -25.838081974))
            Line((4.232512174, -25.838081974), (4.232512174, -20.188081974))
            Line((4.232512174, -20.188081974), (-0.767487826, -20.188081974))
            Line((-0.767487826, -20.188081974), (-0.767487826, -32.588081974))
            Line((-0.767487826, -32.588081974), (4.232512174, -32.588081974))
            Line((4.232512174, -32.588081974), (4.232512174, -26.938081974))
            Line((4.232512174, -26.938081974), (2.667676828, -26.938081974))
            ThreePointArc((2.667676828, -26.938081974), (0.832512174, -26.388081974), (2.667676828, -25.838081974))
        make_face()
        with BuildLine():
            Line((-23.367487826, -32.588081974), (-23.367487826, -20.188081974))
            Line((-23.367487826, -20.188081974), (-28.367487826, -20.188081974))
            Line((-28.367487826, -20.188081974), (-28.367487826, -25.838081974))
            Line((-28.367487826, -25.838081974), (-26.802652481, -25.838081974))
            ThreePointArc((-26.802652481, -25.838081974), (-24.967487826, -26.388081974), (-26.802652481, -26.938081974))
            Line((-26.802652481, -26.938081974), (-28.367487826, -26.938081974))
            Line((-28.367487826, -26.938081974), (-28.367487826, -32.588081974))
            Line((-28.367487826, -32.588081974), (-23.367487826, -32.588081974))
        make_face()
    extrude(amount=SERVO_MICRO_3_DEPTH)

    # Servo Micro 4 outline → Servo Micro 4 (add)
    with BuildSketch(Plane(origin=(0, 0, 0), x_dir=(1, 0, 0), z_dir=(0, 1, 0)).offset(SERVO_START_4)):
        with Locations((-17.167487826, -26.388081974)):
            Circle(SERVO_MICRO_4_OUTLINE_R)
    extrude(amount=SERVO_MICRO_4_DEPTH)


with BuildPart() as body_3:
    # Servo Micro 5 outline → Servo Micro 5 (new body)
    with BuildSketch(Plane.YZ.offset(SERVO_START_5)):
        with Locations((-8.260864102, 25.188081974)):
            Circle(SERVO_MICRO_5_OUTLINE_R)
    extrude(amount=SERVO_MICRO_5_DEPTH)


with BuildPart() as body_4:
    # Servo Micro 6 outline → Servo Micro 6 (new body)
    with BuildSketch(Plane.YZ.offset(SERVO_START_5)):
        with Locations((-8.260864102, 27.588081974)):
            Circle(SERVO_MICRO_6_OUTLINE_R)
    extrude(amount=SERVO_MICRO_6_DEPTH)


with BuildPart() as body_5:
    # Servo Micro 7 outline → Servo Micro 7 (new body)
    with BuildSketch(Plane.YZ.offset(SERVO_START_5)):
        with Locations((-8.260864102, 26.388081974)):
            Circle(SERVO_MICRO_7_OUTLINE_R)
    extrude(amount=SERVO_MICRO_7_DEPTH)


with BuildPart() as body_2_1:
    # Body-Move/Copy1: read off the stored shape, not the designer's step
    # Body-Move/Copy1: moved
    add(body_2.part.moved(Location((12.0627605, 7.6108641, -11.188082))).rotate(Axis((0, 0, 0), (0, 0, -1)), BODY_MOVE_COPY1_ANGLE))


solid = part.part
